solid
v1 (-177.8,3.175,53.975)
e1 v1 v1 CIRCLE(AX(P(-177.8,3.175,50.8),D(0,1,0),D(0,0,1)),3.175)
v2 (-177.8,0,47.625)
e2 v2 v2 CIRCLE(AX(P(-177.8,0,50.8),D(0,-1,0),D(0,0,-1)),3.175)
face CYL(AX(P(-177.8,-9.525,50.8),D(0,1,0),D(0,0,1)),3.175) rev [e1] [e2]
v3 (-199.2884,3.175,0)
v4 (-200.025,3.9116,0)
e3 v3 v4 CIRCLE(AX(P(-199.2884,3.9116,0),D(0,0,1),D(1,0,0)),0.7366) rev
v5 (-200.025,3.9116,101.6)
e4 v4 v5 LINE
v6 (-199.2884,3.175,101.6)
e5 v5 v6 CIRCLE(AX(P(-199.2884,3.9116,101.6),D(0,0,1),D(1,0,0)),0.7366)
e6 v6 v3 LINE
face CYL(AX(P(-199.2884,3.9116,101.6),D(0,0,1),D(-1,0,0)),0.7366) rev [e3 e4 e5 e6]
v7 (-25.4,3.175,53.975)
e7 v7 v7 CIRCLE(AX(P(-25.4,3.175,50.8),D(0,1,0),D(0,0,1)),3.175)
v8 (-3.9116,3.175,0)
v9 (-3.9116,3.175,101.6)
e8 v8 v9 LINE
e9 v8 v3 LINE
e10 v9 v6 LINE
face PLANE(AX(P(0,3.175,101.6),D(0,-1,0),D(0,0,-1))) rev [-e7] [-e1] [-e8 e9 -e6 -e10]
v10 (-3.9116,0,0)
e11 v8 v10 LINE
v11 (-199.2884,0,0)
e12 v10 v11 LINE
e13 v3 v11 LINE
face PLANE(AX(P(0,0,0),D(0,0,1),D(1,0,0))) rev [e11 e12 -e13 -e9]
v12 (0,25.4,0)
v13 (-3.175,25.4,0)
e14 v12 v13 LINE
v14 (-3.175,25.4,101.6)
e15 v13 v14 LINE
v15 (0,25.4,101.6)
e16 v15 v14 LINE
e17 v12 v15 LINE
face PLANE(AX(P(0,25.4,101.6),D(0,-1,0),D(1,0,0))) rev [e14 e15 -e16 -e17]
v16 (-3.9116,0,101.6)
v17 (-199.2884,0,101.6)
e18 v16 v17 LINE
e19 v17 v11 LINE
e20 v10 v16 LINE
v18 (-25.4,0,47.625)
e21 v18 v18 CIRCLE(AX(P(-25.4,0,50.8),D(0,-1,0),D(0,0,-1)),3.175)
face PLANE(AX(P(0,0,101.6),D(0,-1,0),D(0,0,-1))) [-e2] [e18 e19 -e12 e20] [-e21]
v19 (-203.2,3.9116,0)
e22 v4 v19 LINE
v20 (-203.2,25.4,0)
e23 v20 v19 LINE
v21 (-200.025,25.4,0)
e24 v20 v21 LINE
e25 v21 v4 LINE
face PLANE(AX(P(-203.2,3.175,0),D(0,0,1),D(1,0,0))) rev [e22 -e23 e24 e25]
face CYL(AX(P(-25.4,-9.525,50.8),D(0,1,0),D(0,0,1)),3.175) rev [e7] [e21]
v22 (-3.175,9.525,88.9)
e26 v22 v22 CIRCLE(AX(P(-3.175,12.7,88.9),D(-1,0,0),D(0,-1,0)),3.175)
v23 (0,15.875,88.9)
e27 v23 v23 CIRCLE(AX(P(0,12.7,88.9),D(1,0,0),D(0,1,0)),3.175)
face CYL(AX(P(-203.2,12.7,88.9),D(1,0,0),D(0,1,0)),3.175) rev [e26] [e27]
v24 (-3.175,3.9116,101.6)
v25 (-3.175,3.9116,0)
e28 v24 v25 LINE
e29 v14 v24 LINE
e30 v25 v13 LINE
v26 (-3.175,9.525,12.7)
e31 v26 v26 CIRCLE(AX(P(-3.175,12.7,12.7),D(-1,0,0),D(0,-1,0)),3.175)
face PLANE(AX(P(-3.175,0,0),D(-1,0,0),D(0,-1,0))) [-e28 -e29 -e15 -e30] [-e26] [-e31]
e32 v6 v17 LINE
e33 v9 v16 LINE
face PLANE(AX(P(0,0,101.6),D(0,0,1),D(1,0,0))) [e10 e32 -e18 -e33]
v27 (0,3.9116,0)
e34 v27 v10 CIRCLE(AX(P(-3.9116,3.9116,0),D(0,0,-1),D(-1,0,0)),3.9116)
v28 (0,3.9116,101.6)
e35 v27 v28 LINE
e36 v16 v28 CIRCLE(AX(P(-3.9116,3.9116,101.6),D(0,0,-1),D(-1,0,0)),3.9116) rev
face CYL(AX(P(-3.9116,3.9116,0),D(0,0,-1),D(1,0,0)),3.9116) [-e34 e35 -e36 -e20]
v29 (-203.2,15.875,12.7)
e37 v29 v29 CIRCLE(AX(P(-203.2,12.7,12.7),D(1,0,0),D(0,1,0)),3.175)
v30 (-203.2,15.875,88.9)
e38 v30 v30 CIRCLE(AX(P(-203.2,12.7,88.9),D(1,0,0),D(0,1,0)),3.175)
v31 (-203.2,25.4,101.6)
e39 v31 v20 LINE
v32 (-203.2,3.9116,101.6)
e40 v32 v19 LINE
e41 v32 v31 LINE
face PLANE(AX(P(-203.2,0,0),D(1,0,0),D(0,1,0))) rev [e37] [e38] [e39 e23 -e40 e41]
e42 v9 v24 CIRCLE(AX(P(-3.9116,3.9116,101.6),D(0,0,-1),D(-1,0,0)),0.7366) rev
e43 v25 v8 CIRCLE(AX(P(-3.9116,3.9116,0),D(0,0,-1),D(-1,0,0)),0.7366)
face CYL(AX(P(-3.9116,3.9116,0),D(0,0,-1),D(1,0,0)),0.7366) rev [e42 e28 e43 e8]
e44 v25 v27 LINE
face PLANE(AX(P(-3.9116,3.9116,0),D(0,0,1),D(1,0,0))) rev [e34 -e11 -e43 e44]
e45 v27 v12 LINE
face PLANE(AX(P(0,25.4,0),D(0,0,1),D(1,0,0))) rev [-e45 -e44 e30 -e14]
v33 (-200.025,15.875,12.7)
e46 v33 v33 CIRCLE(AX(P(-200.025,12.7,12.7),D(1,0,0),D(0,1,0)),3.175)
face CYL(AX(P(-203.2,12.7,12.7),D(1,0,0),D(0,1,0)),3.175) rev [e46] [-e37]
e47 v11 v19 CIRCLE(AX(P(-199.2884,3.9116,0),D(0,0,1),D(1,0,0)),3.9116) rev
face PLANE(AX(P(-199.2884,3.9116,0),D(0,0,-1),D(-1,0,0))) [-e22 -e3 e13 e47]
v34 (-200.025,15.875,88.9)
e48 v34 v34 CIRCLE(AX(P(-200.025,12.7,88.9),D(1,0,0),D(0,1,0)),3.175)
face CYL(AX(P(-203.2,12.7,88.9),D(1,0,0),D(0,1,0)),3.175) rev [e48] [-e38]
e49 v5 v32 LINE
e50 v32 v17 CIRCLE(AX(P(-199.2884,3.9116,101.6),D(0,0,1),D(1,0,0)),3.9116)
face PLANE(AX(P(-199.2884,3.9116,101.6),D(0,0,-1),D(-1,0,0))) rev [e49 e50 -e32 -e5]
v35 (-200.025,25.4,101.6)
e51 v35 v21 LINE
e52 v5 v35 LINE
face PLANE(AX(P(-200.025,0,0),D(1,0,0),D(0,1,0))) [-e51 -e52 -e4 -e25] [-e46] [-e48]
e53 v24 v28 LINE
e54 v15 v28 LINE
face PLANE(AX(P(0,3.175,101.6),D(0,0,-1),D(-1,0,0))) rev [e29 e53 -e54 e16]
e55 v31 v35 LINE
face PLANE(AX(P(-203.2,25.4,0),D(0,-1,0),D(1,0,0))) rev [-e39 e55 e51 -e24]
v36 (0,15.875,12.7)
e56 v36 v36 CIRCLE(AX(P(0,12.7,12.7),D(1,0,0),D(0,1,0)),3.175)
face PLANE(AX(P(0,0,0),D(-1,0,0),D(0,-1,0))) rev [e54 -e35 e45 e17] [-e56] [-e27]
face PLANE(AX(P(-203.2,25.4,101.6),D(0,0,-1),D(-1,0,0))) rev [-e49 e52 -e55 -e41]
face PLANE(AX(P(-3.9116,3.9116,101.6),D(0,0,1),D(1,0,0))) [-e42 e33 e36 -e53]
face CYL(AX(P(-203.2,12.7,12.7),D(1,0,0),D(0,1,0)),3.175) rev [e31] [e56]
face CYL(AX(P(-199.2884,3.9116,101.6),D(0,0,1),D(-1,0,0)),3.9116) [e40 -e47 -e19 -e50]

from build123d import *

# Parameters (mm, degrees)
BASE_FLANGE1_OUTLINE_W       = 203.2
BASE_FLANGE1_OUTLINE_H       = 3.175
BASE_FLANGE1_DEPTH           = 101.6
EDGE_FLANGE1_STRIP_W         = 14.1732
EDGE_FLANGE1_STRIP_H         = 3.175
EDGE_FLANGE1_STRIP_CUT_DEPTH = 101.6
EDGE_FLANGE1_DEPTH           = 101.6
EDGE_FLANGE2_STRIP_W         = 14.1732
EDGE_FLANGE2_STRIP_H         = 3.175
EDGE_FLANGE2_STRIP_CUT_DEPTH = 101.6
EDGE_FLANGE2_DEPTH           = 101.6
SKETCH38_R                   = 3.175
CUT_EXTRUDE2_DEPTH           = 229.6
SKETCH45_R                   = 3.175
CUT_EXTRUDE3_DEPTH           = 12.7


# Read off the part's stored shape, not the designer's step: Base-Flange1
# Sheet-metal steps are written as plain solids
with BuildPart() as part:
    # Base-Flange1 outline → Base-Flange1 (new body)
    with BuildSketch(Plane.XY):
        with Locations((-101.6, 1.5875)):
            Rectangle(BASE_FLANGE1_OUTLINE_W, BASE_FLANGE1_OUTLINE_H)
    extrude(amount=BASE_FLANGE1_DEPTH)

    # Edge-Flange1 strip (across the edge) → Edge-Flange1 strip cut (cut)
    with BuildSketch(Plane(origin=(-203.2, 3.175, 0), x_dir=(1, 0, 0), z_dir=(0, 0, 1))):
        with Locations((-3.175, -1.5875)):
            Rectangle(EDGE_FLANGE1_STRIP_W, EDGE_FLANGE1_STRIP_H)
    extrude(amount=EDGE_FLANGE1_STRIP_CUT_DEPTH, mode=Mode.SUBTRACT)

    # Edge-Flange1 section (across the edge) → Edge-Flange1 (add)
    with BuildSketch(Plane(origin=(-203.2, 3.175, 0), x_dir=(1, 0, 0), z_dir=(0, 0, 1))):
        with BuildLine():
            Line((0, 0.7366), (0, 22.225))
            Line((0, 22.225), (3.175, 22.225))
            Line((3.175, 22.225), (3.175, 0.7366))
            ThreePointArc((3.175, 0.7366), (3.390745145, 0.215745145), (3.9116, 0))
            Line((3.9116, 0), (3.9116, -3.175))
            ThreePointArc((3.9116, -3.175), (1.145681115, -2.029318885), (0, 0.7366))
        make_face()
    extrude(amount=EDGE_FLANGE1_DEPTH)

    # Edge-Flange2 strip (across the edge) → Edge-Flange2 strip cut (cut)
    with BuildSketch(Plane(origin=(0, 3.175, 101.6), x_dir=(-1, 0, 0), z_dir=(0, 0, -1))):
        with Locations((-3.175, -1.5875)):
            Rectangle(EDGE_FLANGE2_STRIP_W, EDGE_FLANGE2_STRIP_H)
    extrude(amount=EDGE_FLANGE2_STRIP_CUT_DEPTH, mode=Mode.SUBTRACT)

    # Edge-Flange2 section (across the edge) → Edge-Flange2 (add)
    with BuildSketch(Plane(origin=(0, 3.175, 101.6), x_dir=(-1, 0, 0), z_dir=(0, 0, -1))):
        with BuildLine():
            Line((0, 0.7366), (0, 22.225))
            Line((0, 22.225), (3.175, 22.225))
            Line((3.175, 22.225), (3.175, 0.7366))
            ThreePointArc((3.175, 0.7366), (3.390745145, 0.215745145), (3.9116, 0))
            Line((3.9116, 0), (3.9116, -3.175))
            ThreePointArc((3.9116, -3.175), (1.145681115, -2.029318885), (0, 0.7366))
        make_face()
    extrude(amount=EDGE_FLANGE2_DEPTH)

    # Sketch38 → Cut-Extrude2 (cut, through all)
    with BuildSketch(Plane(origin=(0, 0, 0), x_dir=(0, 0, -1), z_dir=(1, 0, 0))):
        with Locations(Location((-12.7, 12.7, 0), (0, 0, 90))):
            Circle(SKETCH38_R)
        with Locations(Location((-88.9, 12.7, 0), (0, 0, 90))):
            Circle(SKETCH38_R)
    extrude(amount=-CUT_EXTRUDE2_DEPTH, mode=Mode.SUBTRACT)

    # Sketch45 → Cut-Extrude3 (cut)
    with BuildSketch(Plane(origin=(0, 3.175, 0), x_dir=(1, 0, 0), z_dir=(0, 1, 0))):
        with Locations(Location((-177.8, -50.8, 0), (0, 0, 270))):
            Circle(SKETCH45_R)
        with Locations(Location((-25.4, -50.8, 0), (0, 0, 270))):
            Circle(SKETCH45_R)
    extrude(amount=-CUT_EXTRUDE3_DEPTH, mode=Mode.SUBTRACT)


solid = part.part
